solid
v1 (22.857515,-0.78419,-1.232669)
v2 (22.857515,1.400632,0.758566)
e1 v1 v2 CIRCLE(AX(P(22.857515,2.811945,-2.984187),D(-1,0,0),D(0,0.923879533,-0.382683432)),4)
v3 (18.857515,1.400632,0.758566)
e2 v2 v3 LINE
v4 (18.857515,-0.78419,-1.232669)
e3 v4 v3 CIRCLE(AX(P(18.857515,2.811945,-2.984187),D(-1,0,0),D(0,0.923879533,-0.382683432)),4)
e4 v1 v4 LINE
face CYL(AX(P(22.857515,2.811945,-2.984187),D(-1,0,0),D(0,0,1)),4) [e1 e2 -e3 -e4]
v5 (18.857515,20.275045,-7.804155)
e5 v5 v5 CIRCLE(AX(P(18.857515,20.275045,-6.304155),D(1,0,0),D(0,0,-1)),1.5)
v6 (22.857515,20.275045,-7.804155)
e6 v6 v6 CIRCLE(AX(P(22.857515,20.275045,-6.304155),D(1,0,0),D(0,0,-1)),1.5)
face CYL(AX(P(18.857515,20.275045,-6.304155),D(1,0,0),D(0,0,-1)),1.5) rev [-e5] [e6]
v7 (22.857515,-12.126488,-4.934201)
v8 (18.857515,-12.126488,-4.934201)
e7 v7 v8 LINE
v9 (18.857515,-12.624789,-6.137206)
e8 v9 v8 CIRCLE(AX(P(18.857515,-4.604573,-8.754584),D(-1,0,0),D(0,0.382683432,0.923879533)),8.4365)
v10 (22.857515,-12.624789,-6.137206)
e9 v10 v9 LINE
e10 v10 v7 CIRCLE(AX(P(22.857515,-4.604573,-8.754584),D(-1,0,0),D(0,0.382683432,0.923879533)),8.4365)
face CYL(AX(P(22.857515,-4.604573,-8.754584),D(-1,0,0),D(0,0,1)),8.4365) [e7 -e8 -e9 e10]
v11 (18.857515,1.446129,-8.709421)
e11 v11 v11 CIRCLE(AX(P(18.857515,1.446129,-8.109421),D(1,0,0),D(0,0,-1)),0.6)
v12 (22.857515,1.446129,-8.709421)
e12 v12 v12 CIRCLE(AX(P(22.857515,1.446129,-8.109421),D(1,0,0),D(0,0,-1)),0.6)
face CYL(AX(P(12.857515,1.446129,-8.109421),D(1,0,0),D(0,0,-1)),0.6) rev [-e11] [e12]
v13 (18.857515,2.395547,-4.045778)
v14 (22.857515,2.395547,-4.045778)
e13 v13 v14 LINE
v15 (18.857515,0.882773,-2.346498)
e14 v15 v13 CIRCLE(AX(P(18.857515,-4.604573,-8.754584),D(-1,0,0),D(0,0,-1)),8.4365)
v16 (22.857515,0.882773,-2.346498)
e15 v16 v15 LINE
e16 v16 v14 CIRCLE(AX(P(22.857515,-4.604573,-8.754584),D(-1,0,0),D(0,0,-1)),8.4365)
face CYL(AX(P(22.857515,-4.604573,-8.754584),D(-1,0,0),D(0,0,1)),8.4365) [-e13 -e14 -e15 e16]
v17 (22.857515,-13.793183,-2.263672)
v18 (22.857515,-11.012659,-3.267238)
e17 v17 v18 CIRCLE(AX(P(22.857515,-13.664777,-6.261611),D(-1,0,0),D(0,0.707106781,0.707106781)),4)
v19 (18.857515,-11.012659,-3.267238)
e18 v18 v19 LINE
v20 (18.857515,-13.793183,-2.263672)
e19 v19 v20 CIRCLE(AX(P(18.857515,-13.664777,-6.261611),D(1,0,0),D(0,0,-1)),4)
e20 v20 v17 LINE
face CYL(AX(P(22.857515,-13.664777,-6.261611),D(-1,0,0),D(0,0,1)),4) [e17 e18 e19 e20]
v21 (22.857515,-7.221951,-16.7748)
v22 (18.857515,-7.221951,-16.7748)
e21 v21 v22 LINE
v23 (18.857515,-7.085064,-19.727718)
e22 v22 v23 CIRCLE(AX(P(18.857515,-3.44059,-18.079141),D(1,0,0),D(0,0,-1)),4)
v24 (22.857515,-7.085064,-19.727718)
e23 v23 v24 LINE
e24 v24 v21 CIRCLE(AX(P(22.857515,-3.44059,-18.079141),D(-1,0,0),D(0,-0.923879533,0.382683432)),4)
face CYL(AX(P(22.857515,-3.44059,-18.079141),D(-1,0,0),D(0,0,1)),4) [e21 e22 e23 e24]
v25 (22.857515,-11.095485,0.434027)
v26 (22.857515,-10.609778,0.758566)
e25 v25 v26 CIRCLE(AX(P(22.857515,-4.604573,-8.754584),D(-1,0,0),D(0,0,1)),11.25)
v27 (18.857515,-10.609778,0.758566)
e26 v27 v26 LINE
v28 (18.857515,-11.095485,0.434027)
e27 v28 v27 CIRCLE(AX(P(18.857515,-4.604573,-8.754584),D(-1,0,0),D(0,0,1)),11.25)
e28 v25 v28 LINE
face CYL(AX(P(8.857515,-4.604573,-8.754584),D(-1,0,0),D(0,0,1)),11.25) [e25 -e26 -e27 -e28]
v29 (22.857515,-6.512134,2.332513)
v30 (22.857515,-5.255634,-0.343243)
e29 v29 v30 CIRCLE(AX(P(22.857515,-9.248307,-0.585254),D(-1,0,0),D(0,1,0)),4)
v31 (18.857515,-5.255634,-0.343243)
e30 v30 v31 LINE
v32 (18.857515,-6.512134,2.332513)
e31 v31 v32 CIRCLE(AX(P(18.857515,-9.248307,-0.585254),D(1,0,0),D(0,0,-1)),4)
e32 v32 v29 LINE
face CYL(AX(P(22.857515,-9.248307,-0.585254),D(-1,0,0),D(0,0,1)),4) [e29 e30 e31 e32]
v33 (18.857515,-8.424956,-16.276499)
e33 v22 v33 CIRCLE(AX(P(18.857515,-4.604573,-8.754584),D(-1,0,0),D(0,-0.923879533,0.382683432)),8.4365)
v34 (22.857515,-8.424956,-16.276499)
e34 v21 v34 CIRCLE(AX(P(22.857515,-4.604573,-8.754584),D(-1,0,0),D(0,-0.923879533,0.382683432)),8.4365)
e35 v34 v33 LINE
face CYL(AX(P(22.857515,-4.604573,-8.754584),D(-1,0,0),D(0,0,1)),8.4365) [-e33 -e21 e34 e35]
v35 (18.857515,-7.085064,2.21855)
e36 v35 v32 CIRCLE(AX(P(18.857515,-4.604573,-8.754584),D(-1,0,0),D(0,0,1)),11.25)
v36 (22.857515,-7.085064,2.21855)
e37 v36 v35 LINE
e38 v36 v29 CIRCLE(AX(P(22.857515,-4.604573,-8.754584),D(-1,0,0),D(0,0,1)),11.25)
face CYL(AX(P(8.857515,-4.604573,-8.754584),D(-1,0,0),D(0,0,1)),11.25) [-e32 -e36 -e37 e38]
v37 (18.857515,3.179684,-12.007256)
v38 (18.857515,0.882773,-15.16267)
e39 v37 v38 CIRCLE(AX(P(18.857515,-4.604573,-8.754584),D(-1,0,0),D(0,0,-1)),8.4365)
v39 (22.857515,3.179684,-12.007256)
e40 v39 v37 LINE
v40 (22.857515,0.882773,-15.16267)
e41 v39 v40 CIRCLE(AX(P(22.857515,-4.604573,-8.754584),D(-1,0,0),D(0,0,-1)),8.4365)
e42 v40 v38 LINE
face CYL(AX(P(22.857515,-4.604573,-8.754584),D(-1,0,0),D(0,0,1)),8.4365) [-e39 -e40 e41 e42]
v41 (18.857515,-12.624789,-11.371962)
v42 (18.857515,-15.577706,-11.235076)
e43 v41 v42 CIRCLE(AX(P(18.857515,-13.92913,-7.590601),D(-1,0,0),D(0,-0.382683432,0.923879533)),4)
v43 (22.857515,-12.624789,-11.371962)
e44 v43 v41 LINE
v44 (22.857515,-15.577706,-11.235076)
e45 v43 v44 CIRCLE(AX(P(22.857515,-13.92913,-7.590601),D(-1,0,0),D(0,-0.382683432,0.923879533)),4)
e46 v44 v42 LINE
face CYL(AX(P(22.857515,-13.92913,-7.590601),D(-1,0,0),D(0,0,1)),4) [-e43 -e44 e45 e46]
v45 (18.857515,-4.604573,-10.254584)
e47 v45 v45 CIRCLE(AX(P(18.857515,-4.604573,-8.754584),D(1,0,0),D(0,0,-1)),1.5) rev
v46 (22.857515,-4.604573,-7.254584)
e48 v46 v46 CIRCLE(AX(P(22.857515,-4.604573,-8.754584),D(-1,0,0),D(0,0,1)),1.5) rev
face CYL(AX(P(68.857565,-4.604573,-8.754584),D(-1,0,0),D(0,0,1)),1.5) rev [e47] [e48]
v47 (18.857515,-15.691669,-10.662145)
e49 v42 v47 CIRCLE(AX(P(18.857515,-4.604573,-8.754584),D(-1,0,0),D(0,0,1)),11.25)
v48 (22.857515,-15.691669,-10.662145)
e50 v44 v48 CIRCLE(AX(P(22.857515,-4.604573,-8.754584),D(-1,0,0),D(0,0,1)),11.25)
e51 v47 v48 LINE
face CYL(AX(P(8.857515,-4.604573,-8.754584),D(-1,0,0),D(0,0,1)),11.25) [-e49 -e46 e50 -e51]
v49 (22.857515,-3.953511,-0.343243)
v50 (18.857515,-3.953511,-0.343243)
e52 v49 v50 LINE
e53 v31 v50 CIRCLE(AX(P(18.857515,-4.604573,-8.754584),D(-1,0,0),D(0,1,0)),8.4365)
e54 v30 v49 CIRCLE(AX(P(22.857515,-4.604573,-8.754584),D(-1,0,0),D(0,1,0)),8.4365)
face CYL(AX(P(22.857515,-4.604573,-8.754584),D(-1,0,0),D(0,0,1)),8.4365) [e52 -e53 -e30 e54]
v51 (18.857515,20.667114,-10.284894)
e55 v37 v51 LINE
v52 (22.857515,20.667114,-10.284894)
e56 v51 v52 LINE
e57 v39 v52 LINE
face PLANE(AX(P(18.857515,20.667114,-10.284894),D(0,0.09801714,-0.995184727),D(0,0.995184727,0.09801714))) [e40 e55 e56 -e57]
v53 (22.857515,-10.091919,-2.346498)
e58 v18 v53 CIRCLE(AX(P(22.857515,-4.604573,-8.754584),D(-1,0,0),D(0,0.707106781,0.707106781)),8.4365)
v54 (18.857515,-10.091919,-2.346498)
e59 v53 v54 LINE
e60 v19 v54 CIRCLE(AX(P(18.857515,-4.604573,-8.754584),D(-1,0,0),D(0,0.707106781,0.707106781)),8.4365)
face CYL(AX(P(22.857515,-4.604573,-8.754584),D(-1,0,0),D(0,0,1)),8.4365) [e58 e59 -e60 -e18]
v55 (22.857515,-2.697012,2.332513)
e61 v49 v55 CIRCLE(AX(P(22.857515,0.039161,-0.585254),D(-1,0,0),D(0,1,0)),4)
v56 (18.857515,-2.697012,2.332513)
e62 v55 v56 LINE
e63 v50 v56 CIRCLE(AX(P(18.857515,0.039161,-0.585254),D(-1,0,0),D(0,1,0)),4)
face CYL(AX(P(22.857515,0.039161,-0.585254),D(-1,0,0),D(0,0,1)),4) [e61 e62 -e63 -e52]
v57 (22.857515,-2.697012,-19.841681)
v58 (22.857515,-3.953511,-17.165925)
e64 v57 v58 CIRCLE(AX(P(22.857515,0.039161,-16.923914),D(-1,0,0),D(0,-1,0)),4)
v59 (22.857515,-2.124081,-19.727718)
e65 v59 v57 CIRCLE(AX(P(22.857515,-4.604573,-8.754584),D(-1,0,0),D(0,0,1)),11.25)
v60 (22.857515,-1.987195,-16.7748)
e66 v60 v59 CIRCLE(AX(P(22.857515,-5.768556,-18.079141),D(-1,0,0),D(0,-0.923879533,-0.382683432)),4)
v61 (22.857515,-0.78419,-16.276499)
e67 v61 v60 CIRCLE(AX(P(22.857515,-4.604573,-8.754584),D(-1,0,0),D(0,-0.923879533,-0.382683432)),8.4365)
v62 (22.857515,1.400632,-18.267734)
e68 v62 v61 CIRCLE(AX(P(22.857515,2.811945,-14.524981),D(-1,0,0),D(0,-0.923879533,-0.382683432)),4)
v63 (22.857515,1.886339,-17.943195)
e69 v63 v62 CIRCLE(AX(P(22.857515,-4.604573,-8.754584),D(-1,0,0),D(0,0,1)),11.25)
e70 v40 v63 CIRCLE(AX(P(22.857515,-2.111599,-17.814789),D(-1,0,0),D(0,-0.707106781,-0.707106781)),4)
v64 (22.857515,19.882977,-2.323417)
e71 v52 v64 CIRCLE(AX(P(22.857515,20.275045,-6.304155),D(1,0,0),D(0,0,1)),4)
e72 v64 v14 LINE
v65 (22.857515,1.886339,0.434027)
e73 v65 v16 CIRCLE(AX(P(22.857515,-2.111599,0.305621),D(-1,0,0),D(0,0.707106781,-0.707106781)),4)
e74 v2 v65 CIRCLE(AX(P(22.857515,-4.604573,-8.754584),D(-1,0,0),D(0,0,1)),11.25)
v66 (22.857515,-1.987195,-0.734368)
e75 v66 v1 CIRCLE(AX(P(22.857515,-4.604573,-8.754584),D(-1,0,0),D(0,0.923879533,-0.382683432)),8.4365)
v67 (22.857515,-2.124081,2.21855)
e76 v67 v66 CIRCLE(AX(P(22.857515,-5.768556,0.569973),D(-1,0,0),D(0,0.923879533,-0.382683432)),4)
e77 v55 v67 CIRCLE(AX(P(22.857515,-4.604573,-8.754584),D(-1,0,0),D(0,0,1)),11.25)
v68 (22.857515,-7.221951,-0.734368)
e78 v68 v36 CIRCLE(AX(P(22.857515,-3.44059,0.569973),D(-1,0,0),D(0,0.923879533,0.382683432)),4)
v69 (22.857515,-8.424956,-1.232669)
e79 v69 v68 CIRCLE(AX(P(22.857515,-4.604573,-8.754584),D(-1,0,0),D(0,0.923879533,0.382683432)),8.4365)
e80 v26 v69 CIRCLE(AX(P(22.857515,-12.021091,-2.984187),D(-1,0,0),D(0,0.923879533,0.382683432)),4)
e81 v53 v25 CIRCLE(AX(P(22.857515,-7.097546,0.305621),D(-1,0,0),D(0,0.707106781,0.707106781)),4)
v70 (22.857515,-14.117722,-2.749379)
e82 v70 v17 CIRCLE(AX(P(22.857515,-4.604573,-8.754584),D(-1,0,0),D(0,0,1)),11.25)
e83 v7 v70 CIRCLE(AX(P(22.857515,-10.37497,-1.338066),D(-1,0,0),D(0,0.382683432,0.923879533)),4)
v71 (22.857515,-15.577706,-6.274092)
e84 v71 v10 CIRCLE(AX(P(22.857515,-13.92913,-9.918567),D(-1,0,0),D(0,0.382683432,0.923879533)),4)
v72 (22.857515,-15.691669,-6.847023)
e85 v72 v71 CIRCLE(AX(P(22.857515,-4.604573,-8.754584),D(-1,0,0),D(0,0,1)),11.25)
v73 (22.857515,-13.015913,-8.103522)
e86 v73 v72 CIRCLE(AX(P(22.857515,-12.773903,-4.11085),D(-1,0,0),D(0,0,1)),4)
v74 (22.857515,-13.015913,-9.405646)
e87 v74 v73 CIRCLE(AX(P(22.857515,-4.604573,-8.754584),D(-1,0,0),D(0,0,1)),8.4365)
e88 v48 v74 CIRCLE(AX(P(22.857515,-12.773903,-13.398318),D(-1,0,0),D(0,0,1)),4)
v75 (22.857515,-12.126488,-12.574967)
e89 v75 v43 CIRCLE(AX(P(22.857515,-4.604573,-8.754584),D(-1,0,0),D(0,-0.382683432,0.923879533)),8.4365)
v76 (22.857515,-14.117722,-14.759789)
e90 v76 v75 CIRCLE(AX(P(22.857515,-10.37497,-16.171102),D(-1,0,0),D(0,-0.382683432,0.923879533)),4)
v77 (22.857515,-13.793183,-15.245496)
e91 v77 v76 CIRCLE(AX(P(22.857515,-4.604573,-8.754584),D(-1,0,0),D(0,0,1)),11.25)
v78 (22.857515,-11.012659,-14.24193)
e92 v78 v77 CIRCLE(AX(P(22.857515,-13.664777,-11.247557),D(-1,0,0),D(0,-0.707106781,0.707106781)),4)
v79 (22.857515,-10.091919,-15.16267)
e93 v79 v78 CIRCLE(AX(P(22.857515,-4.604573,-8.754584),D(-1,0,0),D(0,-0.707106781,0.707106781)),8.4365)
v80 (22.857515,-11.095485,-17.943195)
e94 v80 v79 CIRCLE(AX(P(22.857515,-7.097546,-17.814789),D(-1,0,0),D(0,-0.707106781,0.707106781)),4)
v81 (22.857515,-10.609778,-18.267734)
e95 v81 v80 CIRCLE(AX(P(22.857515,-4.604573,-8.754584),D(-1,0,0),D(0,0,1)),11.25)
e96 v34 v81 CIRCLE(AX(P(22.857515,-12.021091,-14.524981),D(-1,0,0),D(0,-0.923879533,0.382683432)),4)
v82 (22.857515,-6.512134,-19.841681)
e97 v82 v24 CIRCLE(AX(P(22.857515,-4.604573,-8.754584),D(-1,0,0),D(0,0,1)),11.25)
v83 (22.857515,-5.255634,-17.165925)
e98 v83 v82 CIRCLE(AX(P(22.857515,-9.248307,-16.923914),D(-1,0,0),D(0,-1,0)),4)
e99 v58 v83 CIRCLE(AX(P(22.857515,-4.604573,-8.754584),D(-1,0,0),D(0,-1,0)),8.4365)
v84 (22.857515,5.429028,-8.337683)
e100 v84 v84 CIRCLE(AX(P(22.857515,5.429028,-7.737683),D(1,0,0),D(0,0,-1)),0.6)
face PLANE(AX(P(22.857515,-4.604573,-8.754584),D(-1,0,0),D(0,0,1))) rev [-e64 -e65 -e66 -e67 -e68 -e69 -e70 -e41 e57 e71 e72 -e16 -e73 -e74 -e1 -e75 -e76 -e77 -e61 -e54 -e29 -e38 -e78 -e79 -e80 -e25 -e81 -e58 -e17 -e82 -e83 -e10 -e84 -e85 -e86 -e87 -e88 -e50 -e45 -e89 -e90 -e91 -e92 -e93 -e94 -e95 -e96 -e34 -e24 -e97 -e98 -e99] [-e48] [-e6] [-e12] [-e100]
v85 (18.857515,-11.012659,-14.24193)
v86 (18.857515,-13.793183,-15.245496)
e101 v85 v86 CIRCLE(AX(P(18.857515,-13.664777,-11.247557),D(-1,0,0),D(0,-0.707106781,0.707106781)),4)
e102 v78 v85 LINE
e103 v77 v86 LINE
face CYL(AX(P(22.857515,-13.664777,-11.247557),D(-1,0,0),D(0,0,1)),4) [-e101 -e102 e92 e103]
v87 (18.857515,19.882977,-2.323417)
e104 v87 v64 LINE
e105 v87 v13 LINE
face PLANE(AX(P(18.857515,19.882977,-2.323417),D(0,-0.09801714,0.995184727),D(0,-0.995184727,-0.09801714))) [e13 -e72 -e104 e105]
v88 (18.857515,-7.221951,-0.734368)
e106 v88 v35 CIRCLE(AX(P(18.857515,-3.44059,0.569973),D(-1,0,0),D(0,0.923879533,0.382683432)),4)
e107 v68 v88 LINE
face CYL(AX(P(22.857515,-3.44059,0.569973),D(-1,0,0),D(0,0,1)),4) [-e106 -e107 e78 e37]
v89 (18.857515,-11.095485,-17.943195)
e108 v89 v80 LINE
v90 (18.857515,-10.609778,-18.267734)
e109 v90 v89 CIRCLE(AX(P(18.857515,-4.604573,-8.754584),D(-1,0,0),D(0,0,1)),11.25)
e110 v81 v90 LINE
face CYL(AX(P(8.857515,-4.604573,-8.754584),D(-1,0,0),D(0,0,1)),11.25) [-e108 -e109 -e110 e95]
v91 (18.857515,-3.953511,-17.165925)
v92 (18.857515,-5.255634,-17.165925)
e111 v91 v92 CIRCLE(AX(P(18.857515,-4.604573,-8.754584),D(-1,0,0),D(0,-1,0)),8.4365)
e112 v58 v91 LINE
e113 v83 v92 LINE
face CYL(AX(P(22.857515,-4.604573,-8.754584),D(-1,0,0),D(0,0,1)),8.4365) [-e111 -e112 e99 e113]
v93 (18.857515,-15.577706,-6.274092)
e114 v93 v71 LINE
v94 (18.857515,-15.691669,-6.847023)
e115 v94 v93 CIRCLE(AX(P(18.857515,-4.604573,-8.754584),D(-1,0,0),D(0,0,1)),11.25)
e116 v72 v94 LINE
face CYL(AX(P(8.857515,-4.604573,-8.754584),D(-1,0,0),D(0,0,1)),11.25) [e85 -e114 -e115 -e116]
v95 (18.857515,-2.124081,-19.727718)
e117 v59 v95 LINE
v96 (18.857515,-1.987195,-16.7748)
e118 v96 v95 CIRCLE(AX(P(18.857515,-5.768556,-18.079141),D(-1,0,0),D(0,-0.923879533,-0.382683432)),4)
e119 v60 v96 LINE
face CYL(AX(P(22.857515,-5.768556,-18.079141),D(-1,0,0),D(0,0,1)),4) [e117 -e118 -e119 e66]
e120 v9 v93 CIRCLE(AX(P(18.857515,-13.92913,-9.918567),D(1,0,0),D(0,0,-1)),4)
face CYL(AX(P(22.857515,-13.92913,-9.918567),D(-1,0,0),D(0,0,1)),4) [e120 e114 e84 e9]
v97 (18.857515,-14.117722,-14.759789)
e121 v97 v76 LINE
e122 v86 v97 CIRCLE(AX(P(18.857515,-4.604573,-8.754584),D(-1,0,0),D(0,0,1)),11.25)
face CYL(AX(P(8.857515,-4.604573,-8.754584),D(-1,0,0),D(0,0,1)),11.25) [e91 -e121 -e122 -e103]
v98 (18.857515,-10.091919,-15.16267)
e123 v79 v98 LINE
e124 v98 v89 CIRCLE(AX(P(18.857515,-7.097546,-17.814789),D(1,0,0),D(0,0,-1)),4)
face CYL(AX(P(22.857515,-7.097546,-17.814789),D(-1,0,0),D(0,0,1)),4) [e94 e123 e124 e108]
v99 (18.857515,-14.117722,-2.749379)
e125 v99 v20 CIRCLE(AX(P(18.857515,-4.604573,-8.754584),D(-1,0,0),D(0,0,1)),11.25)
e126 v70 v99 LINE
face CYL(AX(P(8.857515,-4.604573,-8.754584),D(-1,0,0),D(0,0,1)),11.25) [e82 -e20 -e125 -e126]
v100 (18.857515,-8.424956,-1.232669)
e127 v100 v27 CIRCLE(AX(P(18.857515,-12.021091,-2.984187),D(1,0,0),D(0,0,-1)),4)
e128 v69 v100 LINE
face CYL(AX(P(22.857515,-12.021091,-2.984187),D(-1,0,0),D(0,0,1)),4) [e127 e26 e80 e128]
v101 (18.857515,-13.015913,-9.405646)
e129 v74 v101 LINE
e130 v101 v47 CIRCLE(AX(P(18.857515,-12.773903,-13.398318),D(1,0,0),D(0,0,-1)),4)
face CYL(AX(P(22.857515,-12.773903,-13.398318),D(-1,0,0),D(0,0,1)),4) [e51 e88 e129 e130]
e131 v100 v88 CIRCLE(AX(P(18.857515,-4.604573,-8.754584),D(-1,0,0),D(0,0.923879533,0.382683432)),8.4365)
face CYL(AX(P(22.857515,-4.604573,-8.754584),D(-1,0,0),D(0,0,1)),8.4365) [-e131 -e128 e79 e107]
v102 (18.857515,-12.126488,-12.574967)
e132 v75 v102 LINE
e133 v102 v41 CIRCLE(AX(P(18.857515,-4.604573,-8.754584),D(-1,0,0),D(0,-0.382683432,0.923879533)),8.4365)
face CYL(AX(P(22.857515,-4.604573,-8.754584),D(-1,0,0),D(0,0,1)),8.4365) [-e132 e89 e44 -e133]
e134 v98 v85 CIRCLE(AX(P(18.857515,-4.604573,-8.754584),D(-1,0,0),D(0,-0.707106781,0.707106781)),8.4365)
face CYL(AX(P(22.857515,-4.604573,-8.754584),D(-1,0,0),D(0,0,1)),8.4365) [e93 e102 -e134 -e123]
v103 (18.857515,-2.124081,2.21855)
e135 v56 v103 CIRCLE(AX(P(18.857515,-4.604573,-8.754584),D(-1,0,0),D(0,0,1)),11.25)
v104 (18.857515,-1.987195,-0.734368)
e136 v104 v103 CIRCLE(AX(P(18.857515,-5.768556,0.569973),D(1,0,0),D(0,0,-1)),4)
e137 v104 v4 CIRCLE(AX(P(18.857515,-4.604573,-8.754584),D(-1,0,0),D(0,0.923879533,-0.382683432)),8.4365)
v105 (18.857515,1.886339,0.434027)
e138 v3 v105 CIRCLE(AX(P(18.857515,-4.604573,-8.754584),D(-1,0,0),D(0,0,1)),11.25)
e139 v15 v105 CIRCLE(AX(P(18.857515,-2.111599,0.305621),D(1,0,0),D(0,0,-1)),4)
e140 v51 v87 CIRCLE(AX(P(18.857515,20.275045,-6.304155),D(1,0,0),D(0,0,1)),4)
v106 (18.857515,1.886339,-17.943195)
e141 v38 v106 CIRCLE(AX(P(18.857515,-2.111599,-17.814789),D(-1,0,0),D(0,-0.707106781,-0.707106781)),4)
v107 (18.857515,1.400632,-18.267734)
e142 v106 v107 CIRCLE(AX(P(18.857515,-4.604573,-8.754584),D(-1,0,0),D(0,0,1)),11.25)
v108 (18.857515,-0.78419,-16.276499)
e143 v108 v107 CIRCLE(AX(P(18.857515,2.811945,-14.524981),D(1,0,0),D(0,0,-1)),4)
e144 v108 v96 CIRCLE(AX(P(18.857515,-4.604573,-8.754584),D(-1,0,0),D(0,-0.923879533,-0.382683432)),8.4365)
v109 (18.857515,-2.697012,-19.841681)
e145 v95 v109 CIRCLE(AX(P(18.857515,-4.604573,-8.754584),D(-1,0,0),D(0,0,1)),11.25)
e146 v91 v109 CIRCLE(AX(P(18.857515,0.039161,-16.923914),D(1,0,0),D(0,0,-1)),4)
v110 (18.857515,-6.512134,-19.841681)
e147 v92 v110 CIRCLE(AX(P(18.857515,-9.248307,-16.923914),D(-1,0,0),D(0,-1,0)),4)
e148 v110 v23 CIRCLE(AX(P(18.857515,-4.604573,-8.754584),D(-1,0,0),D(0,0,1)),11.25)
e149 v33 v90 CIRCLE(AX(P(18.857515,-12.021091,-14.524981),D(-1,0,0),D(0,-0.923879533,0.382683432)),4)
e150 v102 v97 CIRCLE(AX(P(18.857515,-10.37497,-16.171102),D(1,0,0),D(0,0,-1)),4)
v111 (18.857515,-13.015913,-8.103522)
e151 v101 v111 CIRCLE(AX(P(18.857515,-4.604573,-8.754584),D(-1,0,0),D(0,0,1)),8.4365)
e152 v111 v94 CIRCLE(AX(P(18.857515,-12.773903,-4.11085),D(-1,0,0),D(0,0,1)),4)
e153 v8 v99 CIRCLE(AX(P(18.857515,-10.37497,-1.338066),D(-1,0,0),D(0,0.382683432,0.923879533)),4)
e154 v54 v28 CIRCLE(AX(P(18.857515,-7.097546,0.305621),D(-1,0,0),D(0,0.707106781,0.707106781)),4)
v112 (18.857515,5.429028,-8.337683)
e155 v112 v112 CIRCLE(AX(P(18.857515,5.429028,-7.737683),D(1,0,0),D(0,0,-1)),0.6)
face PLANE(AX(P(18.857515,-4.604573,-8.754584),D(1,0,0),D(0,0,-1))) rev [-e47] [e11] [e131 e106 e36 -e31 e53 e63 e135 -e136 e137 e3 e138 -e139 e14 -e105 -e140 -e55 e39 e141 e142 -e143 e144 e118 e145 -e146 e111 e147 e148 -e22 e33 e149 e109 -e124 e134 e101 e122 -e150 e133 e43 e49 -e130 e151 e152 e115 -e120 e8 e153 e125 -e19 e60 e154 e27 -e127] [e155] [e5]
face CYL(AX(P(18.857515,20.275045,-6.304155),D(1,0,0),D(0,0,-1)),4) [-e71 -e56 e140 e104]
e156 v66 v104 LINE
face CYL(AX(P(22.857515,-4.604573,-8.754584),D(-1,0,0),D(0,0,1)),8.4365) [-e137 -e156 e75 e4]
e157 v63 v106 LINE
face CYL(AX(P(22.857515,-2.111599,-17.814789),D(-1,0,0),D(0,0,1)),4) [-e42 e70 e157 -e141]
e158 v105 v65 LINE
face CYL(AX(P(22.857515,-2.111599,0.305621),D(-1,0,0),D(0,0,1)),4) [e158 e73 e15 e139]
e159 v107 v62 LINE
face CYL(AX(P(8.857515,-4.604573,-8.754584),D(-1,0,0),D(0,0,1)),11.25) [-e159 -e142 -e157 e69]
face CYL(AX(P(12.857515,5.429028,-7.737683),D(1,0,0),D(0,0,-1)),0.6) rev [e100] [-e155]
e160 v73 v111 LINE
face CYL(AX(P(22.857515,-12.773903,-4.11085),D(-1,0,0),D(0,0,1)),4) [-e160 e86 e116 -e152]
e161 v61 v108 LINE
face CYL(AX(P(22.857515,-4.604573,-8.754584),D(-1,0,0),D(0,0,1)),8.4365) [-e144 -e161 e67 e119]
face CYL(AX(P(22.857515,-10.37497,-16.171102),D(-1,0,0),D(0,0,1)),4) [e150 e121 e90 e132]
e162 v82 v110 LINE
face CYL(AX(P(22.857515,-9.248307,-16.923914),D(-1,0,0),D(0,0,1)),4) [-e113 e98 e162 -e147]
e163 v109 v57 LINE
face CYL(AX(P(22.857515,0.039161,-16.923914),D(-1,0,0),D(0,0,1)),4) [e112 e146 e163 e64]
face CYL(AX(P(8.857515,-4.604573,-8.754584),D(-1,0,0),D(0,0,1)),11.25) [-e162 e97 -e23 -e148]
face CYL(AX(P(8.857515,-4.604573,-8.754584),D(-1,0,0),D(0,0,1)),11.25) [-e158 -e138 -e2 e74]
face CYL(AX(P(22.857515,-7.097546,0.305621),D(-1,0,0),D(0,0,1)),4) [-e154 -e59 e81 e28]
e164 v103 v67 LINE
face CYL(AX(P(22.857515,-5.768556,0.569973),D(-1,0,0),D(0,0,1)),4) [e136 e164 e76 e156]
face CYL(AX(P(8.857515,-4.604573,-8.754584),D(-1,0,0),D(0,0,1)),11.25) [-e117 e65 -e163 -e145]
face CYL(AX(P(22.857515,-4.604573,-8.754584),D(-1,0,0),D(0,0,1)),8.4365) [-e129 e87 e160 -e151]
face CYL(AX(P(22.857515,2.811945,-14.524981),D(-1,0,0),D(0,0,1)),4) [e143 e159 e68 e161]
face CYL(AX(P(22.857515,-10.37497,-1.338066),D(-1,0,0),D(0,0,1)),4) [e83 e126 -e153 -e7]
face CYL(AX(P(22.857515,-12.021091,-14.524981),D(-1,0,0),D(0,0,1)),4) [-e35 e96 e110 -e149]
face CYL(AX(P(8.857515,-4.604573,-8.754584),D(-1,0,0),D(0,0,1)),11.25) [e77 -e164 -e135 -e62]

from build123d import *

# Parameters (mm, degrees)
SPUR_START             = 18.857514679
SPUR_GEAR_GB_OUTLINE_R = 1.5
SPUR_GEAR_GB_DEPTH     = 4
CUT_EXTRUDE_START      = -10
CUT_EXTRUDE_1_DEPTH    = 10
EXTRUDE_START          = -4
SKETCH_3_R             = 1.5
EXTRUDE_1_DEPTH        = 4
SKETCH_5_R             = 0.6
CUT_EXTRUDE_2_DEPTH    = 10


# Read off the part's stored shape, not the designer's step: spur gear_gb
with BuildPart() as part:
    # spur gear_gb outline → spur gear_gb (new body)
    with BuildSketch(Plane.YZ.offset(SPUR_START)):
        with BuildLine():
            ThreePointArc((-2.124081285, 2.218549628), (-2.409806694, 2.279250398), (-2.69701173, 2.332512579))
            ThreePointArc((-2.69701173, 2.332512579), (-3.581509704, 1.114965359), (-3.953511283, -0.34324338))
            ThreePointArc((-3.953511283, -0.34324338), (-4.604572817, -0.318084007), (-5.25563435, -0.34324338))
            ThreePointArc((-5.25563435, -0.34324338), (-5.627635929, 1.114965359), (-6.512133903, 2.332512579))
            ThreePointArc((-6.512133903, 2.332512579), (-6.799338939, 2.279250398), (-7.085064348, 2.218549628))
            ThreePointArc((-7.085064348, 2.218549628), (-7.436298774, 0.75519995), (-7.221951093, -0.734368099))
            ThreePointArc((-7.221951093, -0.734368099), (-7.833081593, -0.960274331), (-8.424955943, -1.232669023))
            ThreePointArc((-8.424955943, -1.232669023), (-9.326672913, -0.027818656), (-10.609777638, 0.75856558))
            ThreePointArc((-10.609777638, 0.75856558), (-10.854737938, 0.599449132), (-11.095484616, 0.434026553))
            ThreePointArc((-11.095484616, 0.434026553), (-10.859983236, -1.052343859), (-10.091918787, -2.346497986))
            ThreePointArc((-10.091918787, -2.346497986), (-10.570079176, -2.789077647), (-11.012658837, -3.267238036))
            ThreePointArc((-11.012658837, -3.267238036), (-12.306812964, -2.499173587), (-13.793183376, -2.263672207))
            ThreePointArc((-13.793183376, -2.263672207), (-13.958605955, -2.504418885), (-14.117722403, -2.749379185))
            ThreePointArc((-14.117722403, -2.749379185), (-13.331338167, -4.03248391), (-12.1264878, -4.93420088))
            ThreePointArc((-12.1264878, -4.93420088), (-12.398882492, -5.52607523), (-12.624788724, -6.13720573))
            ThreePointArc((-12.624788724, -6.13720573), (-14.114356773, -5.922858049), (-15.577706451, -6.274092475))
            ThreePointArc((-15.577706451, -6.274092475), (-15.638407221, -6.559817884), (-15.691669402, -6.84702292))
            ThreePointArc((-15.691669402, -6.84702292), (-14.474122182, -7.731520894), (-13.015913443, -8.103522473))
            ThreePointArc((-13.015913443, -8.103522473), (-13.041072816, -8.754584007), (-13.015913443, -9.40564554))
            ThreePointArc((-13.015913443, -9.40564554), (-14.474122182, -9.777647119), (-15.691669402, -10.662145093))
            ThreePointArc((-15.691669402, -10.662145093), (-15.638407221, -10.949350129), (-15.577706451, -11.235075538))
            ThreePointArc((-15.577706451, -11.235075538), (-14.114356773, -11.586309964), (-12.624788724, -11.371962283))
            ThreePointArc((-12.624788724, -11.371962283), (-12.398882492, -11.983092783), (-12.1264878, -12.574967133))
            ThreePointArc((-12.1264878, -12.574967133), (-13.331338167, -13.476684103), (-14.117722403, -14.759788828))
            ThreePointArc((-14.117722403, -14.759788828), (-13.958605955, -15.004749128), (-13.793183376, -15.245495806))
            ThreePointArc((-13.793183376, -15.245495806), (-12.306812964, -15.009994426), (-11.012658837, -14.241929977))
            ThreePointArc((-11.012658837, -14.241929977), (-10.570079176, -14.720090366), (-10.091918787, -15.162670027))
            ThreePointArc((-10.091918787, -15.162670027), (-10.859983236, -16.456824154), (-11.095484616, -17.943194566))
            ThreePointArc((-11.095484616, -17.943194566), (-10.854737938, -18.108617145), (-10.609777638, -18.267733593))
            ThreePointArc((-10.609777638, -18.267733593), (-9.326672913, -17.481349357), (-8.424955943, -16.27649899))
            ThreePointArc((-8.424955943, -16.27649899), (-7.833081594, -16.548893683), (-7.221951093, -16.774799914))
            ThreePointArc((-7.221951093, -16.774799914), (-7.436298774, -18.264367963), (-7.085064348, -19.727717641))
            ThreePointArc((-7.085064348, -19.727717641), (-6.799338939, -19.788418411), (-6.512133903, -19.841680592))
            ThreePointArc((-6.512133903, -19.841680592), (-5.627635929, -18.624133372), (-5.25563435, -17.165924633))
            ThreePointArc((-5.25563435, -17.165924633), (-4.604572817, -17.191084007), (-3.953511283, -17.165924633))
            ThreePointArc((-3.953511283, -17.165924633), (-3.581509704, -18.624133372), (-2.69701173, -19.841680592))
            ThreePointArc((-2.69701173, -19.841680592), (-2.409806694, -19.788418411), (-2.124081285, -19.727717641))
            ThreePointArc((-2.124081285, -19.727717641), (-1.772846859, -18.264367963), (-1.98719454, -16.774799914))
            ThreePointArc((-1.98719454, -16.774799914), (-1.376064039, -16.548893683), (-0.78418969, -16.27649899))
            ThreePointArc((-0.78418969, -16.27649899), (0.11752728, -17.481349357), (1.400632005, -18.267733593))
            ThreePointArc((1.400632005, -18.267733593), (1.645592305, -18.108617145), (1.886338983, -17.943194566))
            ThreePointArc((1.886338983, -17.943194566), (1.650837603, -16.456824154), (0.882773154, -15.162670027))
            ThreePointArc((0.882773154, -15.162670027), (1.360933543, -14.720090366), (1.803513204, -14.241929977))
            ThreePointArc((1.803513204, -14.241929977), (3.097667331, -15.009994426), (4.584037743, -15.245495806))
            ThreePointArc((4.584037743, -15.245495806), (4.749460322, -15.004749128), (4.90857677, -14.759788828))
            ThreePointArc((4.90857677, -14.759788828), (4.122192534, -13.476684103), (2.917342167, -12.574967133))
            ThreePointArc((2.917342167, -12.574967133), (3.18973686, -11.983092784), (3.415643091, -11.371962283))
            ThreePointArc((3.415643091, -11.371962283), (4.90521114, -11.586309964), (6.368560818, -11.235075538))
            ThreePointArc((6.368560818, -11.235075538), (6.429261588, -10.949350129), (6.482523769, -10.662145093))
            ThreePointArc((6.482523769, -10.662145093), (5.264976549, -9.777647119), (3.80676781, -9.40564554))
            ThreePointArc((3.80676781, -9.40564554), (3.831927184, -8.754584007), (3.80676781, -8.103522473))
            ThreePointArc((3.80676781, -8.103522473), (5.264976549, -7.731520894), (6.482523769, -6.84702292))
            ThreePointArc((6.482523769, -6.84702292), (6.429261588, -6.559817884), (6.368560818, -6.274092475))
            ThreePointArc((6.368560818, -6.274092475), (4.90521114, -5.922858049), (3.415643091, -6.13720573))
            ThreePointArc((3.415643091, -6.13720573), (3.18973686, -5.526075229), (2.917342167, -4.93420088))
            ThreePointArc((2.917342167, -4.93420088), (4.122192534, -4.03248391), (4.90857677, -2.749379185))
            ThreePointArc((4.90857677, -2.749379185), (4.749460322, -2.504418885), (4.584037743, -2.263672207))
            ThreePointArc((4.584037743, -2.263672207), (3.097667331, -2.499173587), (1.803513204, -3.267238036))
            ThreePointArc((1.803513204, -3.267238036), (1.360933543, -2.789077647), (0.882773154, -2.346497986))
            ThreePointArc((0.882773154, -2.346497986), (1.650837603, -1.052343859), (1.886338983, 0.434026553))
            ThreePointArc((1.886338983, 0.434026553), (1.645592305, 0.599449132), (1.400632005, 0.75856558))
            ThreePointArc((1.400632005, 0.75856558), (0.11752728, -0.027818656), (-0.78418969, -1.232669023))
            ThreePointArc((-0.78418969, -1.232669023), (-1.37606404, -0.960274331), (-1.98719454, -0.734368099))
            ThreePointArc((-1.98719454, -0.734368099), (-1.772846859, 0.75519995), (-2.124081285, 2.218549628))
        make_face()
        with Locations((-4.604572816, -8.754584007)):
            Circle(SPUR_GEAR_GB_OUTLINE_R, mode=Mode.SUBTRACT)
    extrude(amount=SPUR_GEAR_GB_DEPTH)

    # 草图2 → 切除-拉伸1 (cut)
    with BuildSketch(Plane(origin=(22.857514679, 0, 0), x_dir=(0, 0, -1), z_dir=(1, 0, 0)).offset(CUT_EXTRUDE_START)):
        with BuildLine():
            ThreePointArc((14.241929977, 1.803513204), (13.441652277, 2.410120568), (12.574967133, 2.917342167))
            ThreePointArc((12.574967133, 2.917342167), (13.476684103, 4.122192534), (14.759788828, 4.90857677))
            ThreePointArc((14.759788828, 4.90857677), (15.004749128, 4.749460322), (15.245495806, 4.584037743))
            ThreePointArc((15.245495806, 4.584037743), (15.009994426, 3.097667331), (14.241929977, 1.803513204))
        make_face()
        with BuildLine():
            ThreePointArc((11.371962283, 3.415643091), (11.586309964, 4.905211141), (11.235075538, 6.368560818))
            ThreePointArc((11.235075538, 6.368560818), (10.949350129, 6.429261588), (10.662145093, 6.482523769))
            ThreePointArc((10.662145093, 6.482523769), (9.777647119, 5.264976549), (9.40564554, 3.80676781))
            ThreePointArc((9.40564554, 3.80676781), (10.400463508, 3.669822202), (11.371962283, 3.415643091))
        make_face()
        with BuildLine():
            ThreePointArc((8.103522473, 3.80676781), (7.731520894, 5.264976549), (6.84702292, 6.482523769))
            ThreePointArc((6.84702292, 6.482523769), (6.559817884, 6.429261588), (6.274092475, 6.368560818))
            ThreePointArc((6.274092475, 6.368560818), (5.922858049, 4.905211141), (6.13720573, 3.415643091))
            ThreePointArc((6.13720573, 3.415643091), (7.108704505, 3.669822202), (8.103522473, 3.80676781))
        make_face()
        with BuildLine():
            ThreePointArc((4.93420088, 2.917342167), (4.03248391, 4.122192534), (2.749379185, 4.90857677))
            ThreePointArc((2.749379185, 4.90857677), (2.504418885, 4.749460322), (2.263672207, 4.584037743))
            ThreePointArc((2.263672207, 4.584037743), (2.499173587, 3.097667331), (3.267238036, 1.803513204))
            ThreePointArc((3.267238036, 1.803513204), (4.067515736, 2.410120568), (4.93420088, 2.917342167))
        make_face()
    extrude(amount=CUT_EXTRUDE_1_DEPTH, mode=Mode.SUBTRACT)

    # 草图3 → 凸台-拉伸1 (add)
    with BuildSketch(Plane(origin=(22.857514679, 0, 0), x_dir=(0, 0, -1), z_dir=(1, 0, 0)).offset(EXTRUDE_START)):
        with BuildLine():
            Line((2.323416592, 19.882976789), (4.7738451, -4.996641378))
            ThreePointArc((4.7738451, -4.996641378), (9.146652568, -8.585311723), (12.735322913, -4.212504255))
            Line((12.735322913, -4.212504255), (10.284894405, 20.667113912))
            ThreePointArc((10.284894405, 20.667113912), (5.912086937, 24.255784257), (2.323416592, 19.882976789))
        make_face()
        with Locations((6.304155498, 20.27504535)):
            Circle(SKETCH_3_R, mode=Mode.SUBTRACT)
        with Locations(Location((8.754584007, -4.604572816, 0), (0, 0, 180))):
            Circle(SKETCH_3_R, mode=Mode.SUBTRACT)
    extrude(amount=EXTRUDE_1_DEPTH)

    # 草图5 → 切除-拉伸2 (cut)
    with BuildSketch(Plane(origin=(22.857514679, 0, 0), x_dir=(0, 0, -1), z_dir=(1, 0, 0))):
        with Locations((8.109420565, 1.446128724)):
            Circle(SKETCH_5_R)
        with Locations((7.737682597, 5.429027561)):
            Circle(SKETCH_5_R)
    extrude(amount=-CUT_EXTRUDE_2_DEPTH, mode=Mode.SUBTRACT)


solid = part.part
